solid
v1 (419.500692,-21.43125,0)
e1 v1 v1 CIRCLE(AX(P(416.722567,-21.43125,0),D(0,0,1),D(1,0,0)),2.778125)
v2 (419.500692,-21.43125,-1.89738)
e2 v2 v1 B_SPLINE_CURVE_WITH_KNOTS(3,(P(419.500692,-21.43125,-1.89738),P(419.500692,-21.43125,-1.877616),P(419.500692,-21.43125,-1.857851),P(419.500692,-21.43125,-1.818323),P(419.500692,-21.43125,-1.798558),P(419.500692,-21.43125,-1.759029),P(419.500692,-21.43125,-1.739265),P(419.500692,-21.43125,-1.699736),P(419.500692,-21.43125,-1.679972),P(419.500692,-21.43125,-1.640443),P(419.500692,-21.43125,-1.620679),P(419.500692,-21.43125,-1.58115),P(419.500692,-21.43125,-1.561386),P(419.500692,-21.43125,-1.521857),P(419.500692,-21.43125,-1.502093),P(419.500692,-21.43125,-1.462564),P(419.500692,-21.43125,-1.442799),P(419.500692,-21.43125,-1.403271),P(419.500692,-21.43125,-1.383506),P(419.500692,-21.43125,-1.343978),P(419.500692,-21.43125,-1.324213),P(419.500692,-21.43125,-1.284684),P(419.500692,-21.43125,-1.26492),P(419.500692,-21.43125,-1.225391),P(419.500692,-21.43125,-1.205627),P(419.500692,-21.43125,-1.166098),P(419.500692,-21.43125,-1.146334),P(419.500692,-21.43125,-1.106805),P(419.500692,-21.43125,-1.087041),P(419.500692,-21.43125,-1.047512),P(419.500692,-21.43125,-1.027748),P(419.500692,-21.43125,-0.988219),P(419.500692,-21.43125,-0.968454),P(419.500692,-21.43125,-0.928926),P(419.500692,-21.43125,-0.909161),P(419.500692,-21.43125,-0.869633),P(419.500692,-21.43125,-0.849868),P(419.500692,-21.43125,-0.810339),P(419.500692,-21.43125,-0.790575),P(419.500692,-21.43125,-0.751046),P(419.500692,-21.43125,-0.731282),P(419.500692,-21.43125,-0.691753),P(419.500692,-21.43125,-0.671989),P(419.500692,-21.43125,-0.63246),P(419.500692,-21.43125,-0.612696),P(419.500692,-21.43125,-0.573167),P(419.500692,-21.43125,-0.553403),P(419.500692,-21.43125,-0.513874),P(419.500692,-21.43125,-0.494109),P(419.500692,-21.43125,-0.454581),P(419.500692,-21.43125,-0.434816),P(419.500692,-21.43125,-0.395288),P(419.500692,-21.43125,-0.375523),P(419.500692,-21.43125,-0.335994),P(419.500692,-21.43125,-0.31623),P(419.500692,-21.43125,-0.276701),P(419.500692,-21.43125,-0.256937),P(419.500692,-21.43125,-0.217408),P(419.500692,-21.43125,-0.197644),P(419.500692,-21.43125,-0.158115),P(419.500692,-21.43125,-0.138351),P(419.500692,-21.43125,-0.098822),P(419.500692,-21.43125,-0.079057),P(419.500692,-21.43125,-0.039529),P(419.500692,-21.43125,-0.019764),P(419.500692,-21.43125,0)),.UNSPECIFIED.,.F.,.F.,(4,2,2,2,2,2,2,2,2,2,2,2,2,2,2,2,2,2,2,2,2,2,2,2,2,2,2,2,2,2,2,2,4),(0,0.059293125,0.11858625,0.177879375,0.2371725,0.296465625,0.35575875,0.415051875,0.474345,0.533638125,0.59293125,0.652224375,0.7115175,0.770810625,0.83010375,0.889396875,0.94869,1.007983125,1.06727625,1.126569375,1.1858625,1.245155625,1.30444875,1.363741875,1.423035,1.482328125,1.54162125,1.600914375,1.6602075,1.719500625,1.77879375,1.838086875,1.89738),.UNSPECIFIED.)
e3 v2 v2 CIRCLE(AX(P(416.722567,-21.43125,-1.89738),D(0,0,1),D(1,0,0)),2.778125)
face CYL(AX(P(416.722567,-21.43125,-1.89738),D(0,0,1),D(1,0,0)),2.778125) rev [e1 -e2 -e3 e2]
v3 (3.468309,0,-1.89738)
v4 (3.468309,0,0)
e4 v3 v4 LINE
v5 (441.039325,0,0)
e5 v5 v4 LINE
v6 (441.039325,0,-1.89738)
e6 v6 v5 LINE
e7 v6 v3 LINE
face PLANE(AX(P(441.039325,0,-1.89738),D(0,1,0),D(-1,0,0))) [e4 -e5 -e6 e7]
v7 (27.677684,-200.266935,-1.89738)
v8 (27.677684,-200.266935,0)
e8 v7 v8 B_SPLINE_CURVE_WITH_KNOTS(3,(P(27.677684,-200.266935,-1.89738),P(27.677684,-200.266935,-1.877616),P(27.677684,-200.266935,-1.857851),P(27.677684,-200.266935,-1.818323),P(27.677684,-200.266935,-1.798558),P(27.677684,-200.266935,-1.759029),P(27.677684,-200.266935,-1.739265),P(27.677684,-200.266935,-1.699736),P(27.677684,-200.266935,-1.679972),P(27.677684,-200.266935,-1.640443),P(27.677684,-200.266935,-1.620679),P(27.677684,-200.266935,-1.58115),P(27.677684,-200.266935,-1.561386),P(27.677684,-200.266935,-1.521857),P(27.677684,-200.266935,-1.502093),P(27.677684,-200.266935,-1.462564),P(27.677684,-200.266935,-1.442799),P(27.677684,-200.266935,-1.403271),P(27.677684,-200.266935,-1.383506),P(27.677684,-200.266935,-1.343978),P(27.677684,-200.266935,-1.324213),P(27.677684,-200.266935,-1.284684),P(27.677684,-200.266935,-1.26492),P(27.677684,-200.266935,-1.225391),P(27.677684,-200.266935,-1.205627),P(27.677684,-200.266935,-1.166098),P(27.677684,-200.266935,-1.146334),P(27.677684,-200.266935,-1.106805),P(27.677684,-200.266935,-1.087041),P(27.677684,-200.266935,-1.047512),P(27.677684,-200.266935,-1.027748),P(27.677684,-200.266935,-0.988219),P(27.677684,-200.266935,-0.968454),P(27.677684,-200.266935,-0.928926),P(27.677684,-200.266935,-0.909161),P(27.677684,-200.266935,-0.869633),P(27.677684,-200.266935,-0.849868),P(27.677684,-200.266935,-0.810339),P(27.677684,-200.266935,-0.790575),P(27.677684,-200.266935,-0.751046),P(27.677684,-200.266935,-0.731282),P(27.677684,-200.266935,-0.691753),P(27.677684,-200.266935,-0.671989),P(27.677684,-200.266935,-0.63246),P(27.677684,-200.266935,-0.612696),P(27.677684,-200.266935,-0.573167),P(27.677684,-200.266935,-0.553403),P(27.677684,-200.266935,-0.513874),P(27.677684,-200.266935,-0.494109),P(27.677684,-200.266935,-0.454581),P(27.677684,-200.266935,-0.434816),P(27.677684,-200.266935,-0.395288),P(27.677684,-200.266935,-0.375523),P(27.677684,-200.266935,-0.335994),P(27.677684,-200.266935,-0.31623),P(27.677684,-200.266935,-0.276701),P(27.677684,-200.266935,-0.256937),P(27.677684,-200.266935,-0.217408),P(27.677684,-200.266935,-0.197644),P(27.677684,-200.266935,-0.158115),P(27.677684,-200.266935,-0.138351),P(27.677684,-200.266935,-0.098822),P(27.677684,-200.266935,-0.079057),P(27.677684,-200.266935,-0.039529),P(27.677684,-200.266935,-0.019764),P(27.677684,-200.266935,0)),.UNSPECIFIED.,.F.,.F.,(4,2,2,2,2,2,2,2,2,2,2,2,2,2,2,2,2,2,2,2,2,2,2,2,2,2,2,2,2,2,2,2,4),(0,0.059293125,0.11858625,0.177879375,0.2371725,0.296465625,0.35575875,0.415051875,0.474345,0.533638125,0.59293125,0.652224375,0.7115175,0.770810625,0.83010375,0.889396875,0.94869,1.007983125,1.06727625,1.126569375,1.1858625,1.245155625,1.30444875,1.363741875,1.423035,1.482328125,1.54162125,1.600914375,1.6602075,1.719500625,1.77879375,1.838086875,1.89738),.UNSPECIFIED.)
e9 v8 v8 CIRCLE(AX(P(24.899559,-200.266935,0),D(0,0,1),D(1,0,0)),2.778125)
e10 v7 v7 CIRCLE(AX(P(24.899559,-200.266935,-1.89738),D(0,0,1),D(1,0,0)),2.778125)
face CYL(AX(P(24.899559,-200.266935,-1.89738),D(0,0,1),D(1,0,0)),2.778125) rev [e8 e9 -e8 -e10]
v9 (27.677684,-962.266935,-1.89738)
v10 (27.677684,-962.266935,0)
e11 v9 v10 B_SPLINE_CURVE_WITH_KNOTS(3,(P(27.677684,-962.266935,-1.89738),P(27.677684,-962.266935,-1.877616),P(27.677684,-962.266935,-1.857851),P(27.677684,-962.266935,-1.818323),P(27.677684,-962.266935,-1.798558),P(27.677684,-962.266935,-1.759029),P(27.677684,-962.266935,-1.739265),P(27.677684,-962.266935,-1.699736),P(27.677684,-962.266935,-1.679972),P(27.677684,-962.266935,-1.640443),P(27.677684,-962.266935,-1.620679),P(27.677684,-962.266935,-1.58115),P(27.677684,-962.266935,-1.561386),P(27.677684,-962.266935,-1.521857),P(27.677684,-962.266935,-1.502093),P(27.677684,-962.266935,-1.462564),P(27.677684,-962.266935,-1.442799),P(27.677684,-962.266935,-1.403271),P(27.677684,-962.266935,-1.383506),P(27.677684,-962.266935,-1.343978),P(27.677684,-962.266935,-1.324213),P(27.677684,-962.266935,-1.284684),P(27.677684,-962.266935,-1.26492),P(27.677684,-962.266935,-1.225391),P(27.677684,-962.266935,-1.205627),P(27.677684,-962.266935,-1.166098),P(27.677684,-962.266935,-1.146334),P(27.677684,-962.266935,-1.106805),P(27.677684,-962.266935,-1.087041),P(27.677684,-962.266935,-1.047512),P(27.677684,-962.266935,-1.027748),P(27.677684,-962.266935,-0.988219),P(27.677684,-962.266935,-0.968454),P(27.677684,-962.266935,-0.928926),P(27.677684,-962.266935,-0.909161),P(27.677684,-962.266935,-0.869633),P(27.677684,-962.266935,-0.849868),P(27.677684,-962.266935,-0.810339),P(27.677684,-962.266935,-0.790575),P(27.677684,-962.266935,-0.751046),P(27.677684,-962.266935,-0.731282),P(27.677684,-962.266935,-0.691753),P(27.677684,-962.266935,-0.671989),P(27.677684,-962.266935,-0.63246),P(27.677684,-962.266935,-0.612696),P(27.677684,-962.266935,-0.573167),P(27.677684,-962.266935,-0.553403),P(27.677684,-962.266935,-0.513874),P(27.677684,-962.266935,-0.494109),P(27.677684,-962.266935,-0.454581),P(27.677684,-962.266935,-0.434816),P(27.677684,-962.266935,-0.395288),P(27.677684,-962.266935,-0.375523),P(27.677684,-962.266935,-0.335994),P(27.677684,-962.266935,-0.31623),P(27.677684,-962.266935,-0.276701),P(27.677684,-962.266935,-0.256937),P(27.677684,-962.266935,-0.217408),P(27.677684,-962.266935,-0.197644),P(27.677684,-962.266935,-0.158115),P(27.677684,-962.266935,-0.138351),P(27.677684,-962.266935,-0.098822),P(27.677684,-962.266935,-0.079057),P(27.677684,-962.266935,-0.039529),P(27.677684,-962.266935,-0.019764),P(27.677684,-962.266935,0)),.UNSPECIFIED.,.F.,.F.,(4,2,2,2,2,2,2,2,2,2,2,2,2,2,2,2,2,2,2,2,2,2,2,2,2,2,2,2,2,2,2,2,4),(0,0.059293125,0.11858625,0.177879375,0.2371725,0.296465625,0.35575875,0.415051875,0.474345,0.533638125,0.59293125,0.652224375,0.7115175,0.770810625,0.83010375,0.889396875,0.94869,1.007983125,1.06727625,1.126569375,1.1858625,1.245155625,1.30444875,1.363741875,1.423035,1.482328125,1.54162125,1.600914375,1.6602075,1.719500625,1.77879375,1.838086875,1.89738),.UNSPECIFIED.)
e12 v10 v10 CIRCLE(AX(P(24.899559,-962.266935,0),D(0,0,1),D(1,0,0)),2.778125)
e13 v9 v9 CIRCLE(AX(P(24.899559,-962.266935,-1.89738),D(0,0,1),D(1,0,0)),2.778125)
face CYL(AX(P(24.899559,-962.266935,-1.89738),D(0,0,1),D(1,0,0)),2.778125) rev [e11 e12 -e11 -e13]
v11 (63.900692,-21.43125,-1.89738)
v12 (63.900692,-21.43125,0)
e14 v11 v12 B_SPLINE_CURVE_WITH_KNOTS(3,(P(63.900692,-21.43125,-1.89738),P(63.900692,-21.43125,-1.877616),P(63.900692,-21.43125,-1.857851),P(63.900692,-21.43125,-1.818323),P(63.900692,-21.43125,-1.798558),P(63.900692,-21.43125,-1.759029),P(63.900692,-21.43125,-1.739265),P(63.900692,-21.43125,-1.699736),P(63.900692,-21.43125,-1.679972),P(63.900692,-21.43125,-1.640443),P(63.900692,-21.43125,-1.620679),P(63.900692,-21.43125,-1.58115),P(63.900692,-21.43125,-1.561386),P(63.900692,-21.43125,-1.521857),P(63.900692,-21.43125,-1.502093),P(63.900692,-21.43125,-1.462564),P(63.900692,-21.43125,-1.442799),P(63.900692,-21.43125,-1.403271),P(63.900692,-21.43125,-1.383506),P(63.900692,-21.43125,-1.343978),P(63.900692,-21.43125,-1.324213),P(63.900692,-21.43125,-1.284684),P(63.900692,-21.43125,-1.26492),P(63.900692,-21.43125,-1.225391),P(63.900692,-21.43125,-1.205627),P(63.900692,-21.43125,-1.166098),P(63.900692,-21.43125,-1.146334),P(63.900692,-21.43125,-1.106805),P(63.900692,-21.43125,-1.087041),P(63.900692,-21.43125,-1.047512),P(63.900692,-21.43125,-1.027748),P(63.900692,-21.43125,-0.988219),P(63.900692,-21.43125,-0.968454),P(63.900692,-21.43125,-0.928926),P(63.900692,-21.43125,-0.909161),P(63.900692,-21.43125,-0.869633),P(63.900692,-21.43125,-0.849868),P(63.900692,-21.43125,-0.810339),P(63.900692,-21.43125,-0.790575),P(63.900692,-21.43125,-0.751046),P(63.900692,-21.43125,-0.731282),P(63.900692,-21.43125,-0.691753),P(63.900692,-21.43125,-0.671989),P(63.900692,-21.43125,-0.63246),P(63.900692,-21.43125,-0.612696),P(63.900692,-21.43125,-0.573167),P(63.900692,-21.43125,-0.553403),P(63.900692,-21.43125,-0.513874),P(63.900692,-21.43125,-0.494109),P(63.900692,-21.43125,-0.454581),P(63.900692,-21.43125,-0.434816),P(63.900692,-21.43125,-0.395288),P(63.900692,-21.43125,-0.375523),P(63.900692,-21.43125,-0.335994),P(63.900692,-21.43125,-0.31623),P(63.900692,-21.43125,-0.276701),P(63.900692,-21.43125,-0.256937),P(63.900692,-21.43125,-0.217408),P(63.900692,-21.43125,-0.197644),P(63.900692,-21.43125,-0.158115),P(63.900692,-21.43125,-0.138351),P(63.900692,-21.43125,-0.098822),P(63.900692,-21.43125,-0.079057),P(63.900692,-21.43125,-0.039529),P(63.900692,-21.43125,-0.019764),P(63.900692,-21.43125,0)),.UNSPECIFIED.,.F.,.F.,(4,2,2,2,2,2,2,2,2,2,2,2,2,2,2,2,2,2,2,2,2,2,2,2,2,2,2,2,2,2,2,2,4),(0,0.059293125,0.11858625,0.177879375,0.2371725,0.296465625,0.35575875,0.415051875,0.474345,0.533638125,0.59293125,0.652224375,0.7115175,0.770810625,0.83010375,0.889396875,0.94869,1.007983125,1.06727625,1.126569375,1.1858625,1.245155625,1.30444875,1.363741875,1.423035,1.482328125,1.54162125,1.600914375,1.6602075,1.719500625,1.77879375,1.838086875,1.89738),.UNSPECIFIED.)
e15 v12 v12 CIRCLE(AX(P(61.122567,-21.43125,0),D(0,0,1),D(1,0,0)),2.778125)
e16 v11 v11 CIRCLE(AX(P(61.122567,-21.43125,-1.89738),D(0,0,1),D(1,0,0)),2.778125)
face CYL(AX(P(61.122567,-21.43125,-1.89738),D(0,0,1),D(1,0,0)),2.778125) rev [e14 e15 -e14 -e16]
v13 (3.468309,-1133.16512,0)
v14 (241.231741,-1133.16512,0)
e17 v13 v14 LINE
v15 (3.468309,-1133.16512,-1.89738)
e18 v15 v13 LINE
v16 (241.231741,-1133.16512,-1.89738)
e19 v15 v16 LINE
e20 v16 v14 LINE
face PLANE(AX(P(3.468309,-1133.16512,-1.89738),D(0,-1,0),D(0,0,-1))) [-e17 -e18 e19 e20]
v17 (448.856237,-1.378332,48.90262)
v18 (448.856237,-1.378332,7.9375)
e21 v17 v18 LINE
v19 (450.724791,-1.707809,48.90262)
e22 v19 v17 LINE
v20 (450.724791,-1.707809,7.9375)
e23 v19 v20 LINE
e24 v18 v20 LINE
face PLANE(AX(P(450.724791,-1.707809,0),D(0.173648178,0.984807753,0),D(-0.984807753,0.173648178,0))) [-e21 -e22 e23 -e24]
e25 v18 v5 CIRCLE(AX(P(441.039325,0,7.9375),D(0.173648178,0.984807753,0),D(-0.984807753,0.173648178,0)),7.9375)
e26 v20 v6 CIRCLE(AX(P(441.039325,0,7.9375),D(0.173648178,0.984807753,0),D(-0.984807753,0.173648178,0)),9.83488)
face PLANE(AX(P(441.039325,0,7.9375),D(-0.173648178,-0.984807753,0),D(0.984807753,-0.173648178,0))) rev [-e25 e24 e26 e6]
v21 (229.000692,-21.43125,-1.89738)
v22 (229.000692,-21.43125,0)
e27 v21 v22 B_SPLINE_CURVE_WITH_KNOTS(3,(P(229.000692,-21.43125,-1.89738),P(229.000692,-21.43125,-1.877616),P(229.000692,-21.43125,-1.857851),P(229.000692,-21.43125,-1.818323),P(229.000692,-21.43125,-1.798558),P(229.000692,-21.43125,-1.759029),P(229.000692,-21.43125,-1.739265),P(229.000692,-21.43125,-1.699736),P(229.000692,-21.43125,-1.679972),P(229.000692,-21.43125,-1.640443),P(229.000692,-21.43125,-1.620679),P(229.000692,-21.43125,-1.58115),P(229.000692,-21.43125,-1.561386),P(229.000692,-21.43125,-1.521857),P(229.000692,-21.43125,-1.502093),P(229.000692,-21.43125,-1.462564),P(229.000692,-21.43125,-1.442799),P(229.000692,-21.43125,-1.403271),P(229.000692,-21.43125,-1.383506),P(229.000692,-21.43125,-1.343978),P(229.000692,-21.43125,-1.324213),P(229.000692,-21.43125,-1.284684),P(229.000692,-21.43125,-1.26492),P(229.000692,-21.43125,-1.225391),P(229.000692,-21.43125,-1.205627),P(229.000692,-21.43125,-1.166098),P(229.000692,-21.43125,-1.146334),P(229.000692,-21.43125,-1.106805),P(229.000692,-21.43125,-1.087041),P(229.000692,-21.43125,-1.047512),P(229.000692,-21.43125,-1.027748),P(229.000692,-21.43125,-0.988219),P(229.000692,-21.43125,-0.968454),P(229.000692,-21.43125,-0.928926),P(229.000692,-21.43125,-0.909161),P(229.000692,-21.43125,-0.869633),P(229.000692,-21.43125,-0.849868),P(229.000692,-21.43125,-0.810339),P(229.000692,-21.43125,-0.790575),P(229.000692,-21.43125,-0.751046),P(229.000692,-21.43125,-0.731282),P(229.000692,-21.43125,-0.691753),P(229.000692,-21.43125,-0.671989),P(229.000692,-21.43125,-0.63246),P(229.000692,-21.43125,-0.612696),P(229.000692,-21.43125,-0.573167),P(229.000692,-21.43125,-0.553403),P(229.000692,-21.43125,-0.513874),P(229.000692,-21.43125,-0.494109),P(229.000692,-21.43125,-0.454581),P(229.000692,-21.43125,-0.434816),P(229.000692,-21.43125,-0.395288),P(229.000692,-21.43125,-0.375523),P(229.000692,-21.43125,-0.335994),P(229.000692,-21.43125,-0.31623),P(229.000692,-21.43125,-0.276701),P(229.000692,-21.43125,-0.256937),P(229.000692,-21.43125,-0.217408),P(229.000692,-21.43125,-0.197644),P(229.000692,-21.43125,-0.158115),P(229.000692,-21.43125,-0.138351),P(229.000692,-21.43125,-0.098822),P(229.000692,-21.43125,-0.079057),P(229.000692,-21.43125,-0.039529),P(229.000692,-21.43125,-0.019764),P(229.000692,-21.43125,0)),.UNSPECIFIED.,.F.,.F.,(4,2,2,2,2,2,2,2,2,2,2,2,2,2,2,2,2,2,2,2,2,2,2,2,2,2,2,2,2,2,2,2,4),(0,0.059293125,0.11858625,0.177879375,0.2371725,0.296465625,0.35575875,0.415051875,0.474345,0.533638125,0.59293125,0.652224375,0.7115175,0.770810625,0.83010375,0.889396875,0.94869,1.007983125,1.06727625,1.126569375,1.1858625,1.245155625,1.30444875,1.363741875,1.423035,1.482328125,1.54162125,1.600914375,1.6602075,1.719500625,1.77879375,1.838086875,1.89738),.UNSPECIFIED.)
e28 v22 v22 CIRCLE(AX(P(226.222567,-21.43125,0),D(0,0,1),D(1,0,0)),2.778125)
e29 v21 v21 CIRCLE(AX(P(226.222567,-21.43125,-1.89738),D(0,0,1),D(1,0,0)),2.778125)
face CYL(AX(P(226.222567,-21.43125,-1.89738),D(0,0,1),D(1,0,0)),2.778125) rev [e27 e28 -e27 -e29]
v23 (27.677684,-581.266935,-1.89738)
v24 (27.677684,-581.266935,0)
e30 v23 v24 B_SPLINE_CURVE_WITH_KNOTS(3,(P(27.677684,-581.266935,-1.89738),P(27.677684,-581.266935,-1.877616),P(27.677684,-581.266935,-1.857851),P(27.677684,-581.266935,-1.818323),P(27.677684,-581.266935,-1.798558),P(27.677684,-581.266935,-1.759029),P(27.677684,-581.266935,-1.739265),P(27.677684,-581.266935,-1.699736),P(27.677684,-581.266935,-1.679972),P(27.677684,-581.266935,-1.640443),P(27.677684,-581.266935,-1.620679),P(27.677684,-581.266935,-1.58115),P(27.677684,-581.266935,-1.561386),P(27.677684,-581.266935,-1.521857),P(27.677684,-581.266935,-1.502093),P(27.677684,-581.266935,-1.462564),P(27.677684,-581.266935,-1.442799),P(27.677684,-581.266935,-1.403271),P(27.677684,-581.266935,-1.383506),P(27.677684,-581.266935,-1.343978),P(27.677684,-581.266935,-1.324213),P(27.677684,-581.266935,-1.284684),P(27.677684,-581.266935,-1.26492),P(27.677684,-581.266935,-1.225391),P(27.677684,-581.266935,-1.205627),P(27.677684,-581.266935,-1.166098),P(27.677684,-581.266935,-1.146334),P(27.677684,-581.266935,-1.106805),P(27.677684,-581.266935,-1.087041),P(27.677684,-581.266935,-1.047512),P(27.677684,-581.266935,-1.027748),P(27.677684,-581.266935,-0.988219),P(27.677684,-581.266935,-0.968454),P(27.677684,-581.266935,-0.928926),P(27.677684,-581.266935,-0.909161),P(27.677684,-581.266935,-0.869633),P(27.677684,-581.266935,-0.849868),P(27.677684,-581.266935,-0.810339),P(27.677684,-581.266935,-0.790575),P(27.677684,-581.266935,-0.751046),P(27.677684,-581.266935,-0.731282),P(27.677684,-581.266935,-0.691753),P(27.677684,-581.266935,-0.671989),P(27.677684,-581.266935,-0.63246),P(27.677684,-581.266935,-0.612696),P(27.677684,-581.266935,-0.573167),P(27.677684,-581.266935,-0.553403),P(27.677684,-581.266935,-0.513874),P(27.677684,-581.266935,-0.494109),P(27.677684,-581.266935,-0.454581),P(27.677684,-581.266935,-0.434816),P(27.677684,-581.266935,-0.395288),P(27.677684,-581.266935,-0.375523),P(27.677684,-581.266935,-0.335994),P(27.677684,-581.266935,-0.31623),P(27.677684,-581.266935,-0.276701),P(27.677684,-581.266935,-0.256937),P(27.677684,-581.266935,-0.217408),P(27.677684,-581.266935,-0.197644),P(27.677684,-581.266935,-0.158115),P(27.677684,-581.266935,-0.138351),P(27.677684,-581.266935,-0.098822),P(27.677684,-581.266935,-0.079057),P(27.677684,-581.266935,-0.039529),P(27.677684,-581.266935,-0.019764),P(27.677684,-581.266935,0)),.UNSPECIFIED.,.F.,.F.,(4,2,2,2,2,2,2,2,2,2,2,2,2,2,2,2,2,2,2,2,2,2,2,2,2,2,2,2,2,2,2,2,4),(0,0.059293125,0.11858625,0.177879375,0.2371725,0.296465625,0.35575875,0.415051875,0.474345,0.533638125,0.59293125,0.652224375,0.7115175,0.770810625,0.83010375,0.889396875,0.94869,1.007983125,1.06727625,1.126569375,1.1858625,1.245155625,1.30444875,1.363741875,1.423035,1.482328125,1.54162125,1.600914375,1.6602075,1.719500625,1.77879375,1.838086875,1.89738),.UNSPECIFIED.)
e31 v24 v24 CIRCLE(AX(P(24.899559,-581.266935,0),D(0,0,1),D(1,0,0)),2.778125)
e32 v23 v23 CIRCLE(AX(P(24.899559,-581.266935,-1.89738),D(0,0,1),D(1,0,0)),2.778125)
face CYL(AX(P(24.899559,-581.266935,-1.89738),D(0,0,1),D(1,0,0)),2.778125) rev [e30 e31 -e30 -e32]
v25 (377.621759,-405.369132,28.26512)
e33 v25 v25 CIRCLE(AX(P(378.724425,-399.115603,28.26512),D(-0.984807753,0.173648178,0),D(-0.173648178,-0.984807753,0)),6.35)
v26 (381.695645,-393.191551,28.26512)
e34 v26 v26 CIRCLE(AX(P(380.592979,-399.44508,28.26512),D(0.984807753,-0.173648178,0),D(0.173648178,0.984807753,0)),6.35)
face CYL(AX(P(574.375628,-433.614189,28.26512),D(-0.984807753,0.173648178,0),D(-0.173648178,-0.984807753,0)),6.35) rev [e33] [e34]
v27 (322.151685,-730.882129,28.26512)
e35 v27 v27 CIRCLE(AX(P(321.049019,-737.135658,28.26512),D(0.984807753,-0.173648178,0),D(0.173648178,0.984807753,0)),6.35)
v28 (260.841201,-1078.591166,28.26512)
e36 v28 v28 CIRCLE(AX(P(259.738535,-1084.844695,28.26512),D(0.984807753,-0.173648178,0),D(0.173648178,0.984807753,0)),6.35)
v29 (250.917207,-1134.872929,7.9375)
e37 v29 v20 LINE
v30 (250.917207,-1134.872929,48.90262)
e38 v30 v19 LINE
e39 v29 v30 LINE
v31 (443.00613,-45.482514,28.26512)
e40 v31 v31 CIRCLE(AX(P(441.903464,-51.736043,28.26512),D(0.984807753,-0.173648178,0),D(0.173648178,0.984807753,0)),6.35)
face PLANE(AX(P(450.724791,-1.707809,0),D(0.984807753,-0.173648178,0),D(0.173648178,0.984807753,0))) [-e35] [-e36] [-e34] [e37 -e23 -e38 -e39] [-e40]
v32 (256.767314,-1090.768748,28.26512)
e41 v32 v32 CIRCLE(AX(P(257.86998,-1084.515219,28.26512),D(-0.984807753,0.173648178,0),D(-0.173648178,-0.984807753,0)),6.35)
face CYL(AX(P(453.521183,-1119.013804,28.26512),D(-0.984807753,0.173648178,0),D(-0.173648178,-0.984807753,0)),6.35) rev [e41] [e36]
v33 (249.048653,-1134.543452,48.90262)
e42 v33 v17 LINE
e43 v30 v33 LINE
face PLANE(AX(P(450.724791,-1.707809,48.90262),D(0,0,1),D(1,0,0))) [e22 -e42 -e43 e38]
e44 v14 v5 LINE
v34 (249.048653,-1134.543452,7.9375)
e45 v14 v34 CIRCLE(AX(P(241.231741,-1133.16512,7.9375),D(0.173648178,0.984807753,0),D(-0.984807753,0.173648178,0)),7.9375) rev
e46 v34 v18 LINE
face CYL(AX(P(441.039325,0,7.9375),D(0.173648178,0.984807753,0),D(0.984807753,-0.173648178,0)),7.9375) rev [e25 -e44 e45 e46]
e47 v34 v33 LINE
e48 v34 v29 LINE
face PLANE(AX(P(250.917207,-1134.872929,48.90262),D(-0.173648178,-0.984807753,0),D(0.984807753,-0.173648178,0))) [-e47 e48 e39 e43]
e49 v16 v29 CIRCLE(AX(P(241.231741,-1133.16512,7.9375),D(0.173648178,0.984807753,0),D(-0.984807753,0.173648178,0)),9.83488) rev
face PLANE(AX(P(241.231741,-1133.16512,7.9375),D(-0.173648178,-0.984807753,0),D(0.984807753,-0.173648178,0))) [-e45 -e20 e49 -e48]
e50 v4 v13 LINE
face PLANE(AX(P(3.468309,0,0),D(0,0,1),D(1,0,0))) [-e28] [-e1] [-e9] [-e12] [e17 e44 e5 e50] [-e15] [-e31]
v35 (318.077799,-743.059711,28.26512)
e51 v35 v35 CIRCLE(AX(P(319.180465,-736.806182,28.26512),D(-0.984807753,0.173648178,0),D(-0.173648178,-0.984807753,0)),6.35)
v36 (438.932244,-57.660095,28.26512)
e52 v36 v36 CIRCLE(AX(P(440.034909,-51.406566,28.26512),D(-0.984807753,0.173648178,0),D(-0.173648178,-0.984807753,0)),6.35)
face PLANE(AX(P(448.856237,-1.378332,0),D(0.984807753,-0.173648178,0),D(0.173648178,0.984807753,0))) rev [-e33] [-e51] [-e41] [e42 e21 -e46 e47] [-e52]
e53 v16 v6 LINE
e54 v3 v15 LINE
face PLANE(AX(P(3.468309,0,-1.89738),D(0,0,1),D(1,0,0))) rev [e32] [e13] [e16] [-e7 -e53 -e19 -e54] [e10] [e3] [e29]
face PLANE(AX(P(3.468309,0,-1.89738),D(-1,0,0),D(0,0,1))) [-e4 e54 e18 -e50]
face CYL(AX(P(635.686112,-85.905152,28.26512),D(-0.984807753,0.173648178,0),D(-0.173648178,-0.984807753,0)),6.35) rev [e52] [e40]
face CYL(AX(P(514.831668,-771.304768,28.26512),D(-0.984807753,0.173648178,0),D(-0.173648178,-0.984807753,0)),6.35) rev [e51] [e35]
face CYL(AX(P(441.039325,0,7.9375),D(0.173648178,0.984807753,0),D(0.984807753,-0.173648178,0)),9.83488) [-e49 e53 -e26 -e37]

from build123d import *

# Parameters (mm, degrees)
BASE_FLANGE1_START = -1.89738
BASE_FLANGE1_DEPTH = 1.89738
EDGE_FLANGE5_DEPTH = 1150.646018509
SKETCH21_R         = 2.778125
CUT_EXTRUDE1_DEPTH = 1.89738
SKETCH22_R         = 6.350000004
CUT_EXTRUDE2_DEPTH = 1144.944756983


# Read off the part's stored shape, not the designer's step: Base-Flange1
# Sheet-metal steps are written as plain solids
with BuildPart() as part:
    # Base-Flange1 outline → Base-Flange1 (new body)
    with BuildSketch(Plane.XY.offset(BASE_FLANGE1_START)):
        Polygon((241.231741087, -1133.16512), (441.039325341, 0), (3.468308846, 0), (3.468308846, -1133.16512), align=None)
    extrude(amount=BASE_FLANGE1_DEPTH)

    # Edge-Flange5 section (across the edge) → Edge-Flange5 (add)
    with BuildSketch(Plane(origin=(249.048652626, -1134.54345241, 0), x_dir=(-0.9848077530122076, 0.17364817766693405, 3.4914813388431337e-15), z_dir=(0.17364817766693405, 0.9848077530122076, 0))):
        with BuildLine():
            Line((-1.89738, 7.9375), (-1.89738, 48.90262))
            Line((-1.89738, 48.90262), (0, 48.90262))
            Line((0, 48.90262), (0, 7.9375))
            ThreePointArc((0, 7.9375), (2.324839924, 2.324839924), (7.9375, 0))
            Line((7.9375, 0), (7.9375, -1.89738))
            ThreePointArc((7.9375, -1.89738), (0.98318966, 0.98318966), (-1.89738, 7.9375))
        make_face()
    extrude(amount=EDGE_FLANGE5_DEPTH)

    # Sketch21 → Cut-Extrude1 (cut)
    with BuildSketch(Plane.XY):
        with Locations((416.722567093, -21.43125)):
            Circle(SKETCH21_R)
        with Locations((226.222567093, -21.43125)):
            Circle(SKETCH21_R)
        with Locations((61.122567093, -21.43125)):
            Circle(SKETCH21_R)
        with Locations((24.899558846, -200.266935)):
            Circle(SKETCH21_R)
        with Locations((24.899558846, -581.266935)):
            Circle(SKETCH21_R)
        with Locations((24.899558846, -962.266935)):
            Circle(SKETCH21_R)
    extrude(amount=-CUT_EXTRUDE1_DEPTH, mode=Mode.SUBTRACT)

    # Sketch22 → Cut-Extrude2 (cut, through all)
    with BuildSketch(Plane(origin=(435.557273959, -76.800499043, 0), x_dir=(0, 0, 1), z_dir=(-0.9848077530122062, 0.17364817766694032, 3.3536738181639377e-15))):
        with Locations(Location((28.26512, 25.785675125, 0), (0, 0, 270))):
            Circle(SKETCH22_R)
        with Locations(Location((28.26512, -327.287334129, 0), (0, 0, 270))):
            Circle(SKETCH22_R)
        with Locations(Location((28.26512, -670.187334129, 0), (0, 0, 270))):
            Circle(SKETCH22_R)
        with Locations(Location((28.26512, -1023.260343384, 0), (0, 0, 270))):
            Circle(SKETCH22_R)
    extrude(amount=-CUT_EXTRUDE2_DEPTH, mode=Mode.SUBTRACT)


solid = part.part
